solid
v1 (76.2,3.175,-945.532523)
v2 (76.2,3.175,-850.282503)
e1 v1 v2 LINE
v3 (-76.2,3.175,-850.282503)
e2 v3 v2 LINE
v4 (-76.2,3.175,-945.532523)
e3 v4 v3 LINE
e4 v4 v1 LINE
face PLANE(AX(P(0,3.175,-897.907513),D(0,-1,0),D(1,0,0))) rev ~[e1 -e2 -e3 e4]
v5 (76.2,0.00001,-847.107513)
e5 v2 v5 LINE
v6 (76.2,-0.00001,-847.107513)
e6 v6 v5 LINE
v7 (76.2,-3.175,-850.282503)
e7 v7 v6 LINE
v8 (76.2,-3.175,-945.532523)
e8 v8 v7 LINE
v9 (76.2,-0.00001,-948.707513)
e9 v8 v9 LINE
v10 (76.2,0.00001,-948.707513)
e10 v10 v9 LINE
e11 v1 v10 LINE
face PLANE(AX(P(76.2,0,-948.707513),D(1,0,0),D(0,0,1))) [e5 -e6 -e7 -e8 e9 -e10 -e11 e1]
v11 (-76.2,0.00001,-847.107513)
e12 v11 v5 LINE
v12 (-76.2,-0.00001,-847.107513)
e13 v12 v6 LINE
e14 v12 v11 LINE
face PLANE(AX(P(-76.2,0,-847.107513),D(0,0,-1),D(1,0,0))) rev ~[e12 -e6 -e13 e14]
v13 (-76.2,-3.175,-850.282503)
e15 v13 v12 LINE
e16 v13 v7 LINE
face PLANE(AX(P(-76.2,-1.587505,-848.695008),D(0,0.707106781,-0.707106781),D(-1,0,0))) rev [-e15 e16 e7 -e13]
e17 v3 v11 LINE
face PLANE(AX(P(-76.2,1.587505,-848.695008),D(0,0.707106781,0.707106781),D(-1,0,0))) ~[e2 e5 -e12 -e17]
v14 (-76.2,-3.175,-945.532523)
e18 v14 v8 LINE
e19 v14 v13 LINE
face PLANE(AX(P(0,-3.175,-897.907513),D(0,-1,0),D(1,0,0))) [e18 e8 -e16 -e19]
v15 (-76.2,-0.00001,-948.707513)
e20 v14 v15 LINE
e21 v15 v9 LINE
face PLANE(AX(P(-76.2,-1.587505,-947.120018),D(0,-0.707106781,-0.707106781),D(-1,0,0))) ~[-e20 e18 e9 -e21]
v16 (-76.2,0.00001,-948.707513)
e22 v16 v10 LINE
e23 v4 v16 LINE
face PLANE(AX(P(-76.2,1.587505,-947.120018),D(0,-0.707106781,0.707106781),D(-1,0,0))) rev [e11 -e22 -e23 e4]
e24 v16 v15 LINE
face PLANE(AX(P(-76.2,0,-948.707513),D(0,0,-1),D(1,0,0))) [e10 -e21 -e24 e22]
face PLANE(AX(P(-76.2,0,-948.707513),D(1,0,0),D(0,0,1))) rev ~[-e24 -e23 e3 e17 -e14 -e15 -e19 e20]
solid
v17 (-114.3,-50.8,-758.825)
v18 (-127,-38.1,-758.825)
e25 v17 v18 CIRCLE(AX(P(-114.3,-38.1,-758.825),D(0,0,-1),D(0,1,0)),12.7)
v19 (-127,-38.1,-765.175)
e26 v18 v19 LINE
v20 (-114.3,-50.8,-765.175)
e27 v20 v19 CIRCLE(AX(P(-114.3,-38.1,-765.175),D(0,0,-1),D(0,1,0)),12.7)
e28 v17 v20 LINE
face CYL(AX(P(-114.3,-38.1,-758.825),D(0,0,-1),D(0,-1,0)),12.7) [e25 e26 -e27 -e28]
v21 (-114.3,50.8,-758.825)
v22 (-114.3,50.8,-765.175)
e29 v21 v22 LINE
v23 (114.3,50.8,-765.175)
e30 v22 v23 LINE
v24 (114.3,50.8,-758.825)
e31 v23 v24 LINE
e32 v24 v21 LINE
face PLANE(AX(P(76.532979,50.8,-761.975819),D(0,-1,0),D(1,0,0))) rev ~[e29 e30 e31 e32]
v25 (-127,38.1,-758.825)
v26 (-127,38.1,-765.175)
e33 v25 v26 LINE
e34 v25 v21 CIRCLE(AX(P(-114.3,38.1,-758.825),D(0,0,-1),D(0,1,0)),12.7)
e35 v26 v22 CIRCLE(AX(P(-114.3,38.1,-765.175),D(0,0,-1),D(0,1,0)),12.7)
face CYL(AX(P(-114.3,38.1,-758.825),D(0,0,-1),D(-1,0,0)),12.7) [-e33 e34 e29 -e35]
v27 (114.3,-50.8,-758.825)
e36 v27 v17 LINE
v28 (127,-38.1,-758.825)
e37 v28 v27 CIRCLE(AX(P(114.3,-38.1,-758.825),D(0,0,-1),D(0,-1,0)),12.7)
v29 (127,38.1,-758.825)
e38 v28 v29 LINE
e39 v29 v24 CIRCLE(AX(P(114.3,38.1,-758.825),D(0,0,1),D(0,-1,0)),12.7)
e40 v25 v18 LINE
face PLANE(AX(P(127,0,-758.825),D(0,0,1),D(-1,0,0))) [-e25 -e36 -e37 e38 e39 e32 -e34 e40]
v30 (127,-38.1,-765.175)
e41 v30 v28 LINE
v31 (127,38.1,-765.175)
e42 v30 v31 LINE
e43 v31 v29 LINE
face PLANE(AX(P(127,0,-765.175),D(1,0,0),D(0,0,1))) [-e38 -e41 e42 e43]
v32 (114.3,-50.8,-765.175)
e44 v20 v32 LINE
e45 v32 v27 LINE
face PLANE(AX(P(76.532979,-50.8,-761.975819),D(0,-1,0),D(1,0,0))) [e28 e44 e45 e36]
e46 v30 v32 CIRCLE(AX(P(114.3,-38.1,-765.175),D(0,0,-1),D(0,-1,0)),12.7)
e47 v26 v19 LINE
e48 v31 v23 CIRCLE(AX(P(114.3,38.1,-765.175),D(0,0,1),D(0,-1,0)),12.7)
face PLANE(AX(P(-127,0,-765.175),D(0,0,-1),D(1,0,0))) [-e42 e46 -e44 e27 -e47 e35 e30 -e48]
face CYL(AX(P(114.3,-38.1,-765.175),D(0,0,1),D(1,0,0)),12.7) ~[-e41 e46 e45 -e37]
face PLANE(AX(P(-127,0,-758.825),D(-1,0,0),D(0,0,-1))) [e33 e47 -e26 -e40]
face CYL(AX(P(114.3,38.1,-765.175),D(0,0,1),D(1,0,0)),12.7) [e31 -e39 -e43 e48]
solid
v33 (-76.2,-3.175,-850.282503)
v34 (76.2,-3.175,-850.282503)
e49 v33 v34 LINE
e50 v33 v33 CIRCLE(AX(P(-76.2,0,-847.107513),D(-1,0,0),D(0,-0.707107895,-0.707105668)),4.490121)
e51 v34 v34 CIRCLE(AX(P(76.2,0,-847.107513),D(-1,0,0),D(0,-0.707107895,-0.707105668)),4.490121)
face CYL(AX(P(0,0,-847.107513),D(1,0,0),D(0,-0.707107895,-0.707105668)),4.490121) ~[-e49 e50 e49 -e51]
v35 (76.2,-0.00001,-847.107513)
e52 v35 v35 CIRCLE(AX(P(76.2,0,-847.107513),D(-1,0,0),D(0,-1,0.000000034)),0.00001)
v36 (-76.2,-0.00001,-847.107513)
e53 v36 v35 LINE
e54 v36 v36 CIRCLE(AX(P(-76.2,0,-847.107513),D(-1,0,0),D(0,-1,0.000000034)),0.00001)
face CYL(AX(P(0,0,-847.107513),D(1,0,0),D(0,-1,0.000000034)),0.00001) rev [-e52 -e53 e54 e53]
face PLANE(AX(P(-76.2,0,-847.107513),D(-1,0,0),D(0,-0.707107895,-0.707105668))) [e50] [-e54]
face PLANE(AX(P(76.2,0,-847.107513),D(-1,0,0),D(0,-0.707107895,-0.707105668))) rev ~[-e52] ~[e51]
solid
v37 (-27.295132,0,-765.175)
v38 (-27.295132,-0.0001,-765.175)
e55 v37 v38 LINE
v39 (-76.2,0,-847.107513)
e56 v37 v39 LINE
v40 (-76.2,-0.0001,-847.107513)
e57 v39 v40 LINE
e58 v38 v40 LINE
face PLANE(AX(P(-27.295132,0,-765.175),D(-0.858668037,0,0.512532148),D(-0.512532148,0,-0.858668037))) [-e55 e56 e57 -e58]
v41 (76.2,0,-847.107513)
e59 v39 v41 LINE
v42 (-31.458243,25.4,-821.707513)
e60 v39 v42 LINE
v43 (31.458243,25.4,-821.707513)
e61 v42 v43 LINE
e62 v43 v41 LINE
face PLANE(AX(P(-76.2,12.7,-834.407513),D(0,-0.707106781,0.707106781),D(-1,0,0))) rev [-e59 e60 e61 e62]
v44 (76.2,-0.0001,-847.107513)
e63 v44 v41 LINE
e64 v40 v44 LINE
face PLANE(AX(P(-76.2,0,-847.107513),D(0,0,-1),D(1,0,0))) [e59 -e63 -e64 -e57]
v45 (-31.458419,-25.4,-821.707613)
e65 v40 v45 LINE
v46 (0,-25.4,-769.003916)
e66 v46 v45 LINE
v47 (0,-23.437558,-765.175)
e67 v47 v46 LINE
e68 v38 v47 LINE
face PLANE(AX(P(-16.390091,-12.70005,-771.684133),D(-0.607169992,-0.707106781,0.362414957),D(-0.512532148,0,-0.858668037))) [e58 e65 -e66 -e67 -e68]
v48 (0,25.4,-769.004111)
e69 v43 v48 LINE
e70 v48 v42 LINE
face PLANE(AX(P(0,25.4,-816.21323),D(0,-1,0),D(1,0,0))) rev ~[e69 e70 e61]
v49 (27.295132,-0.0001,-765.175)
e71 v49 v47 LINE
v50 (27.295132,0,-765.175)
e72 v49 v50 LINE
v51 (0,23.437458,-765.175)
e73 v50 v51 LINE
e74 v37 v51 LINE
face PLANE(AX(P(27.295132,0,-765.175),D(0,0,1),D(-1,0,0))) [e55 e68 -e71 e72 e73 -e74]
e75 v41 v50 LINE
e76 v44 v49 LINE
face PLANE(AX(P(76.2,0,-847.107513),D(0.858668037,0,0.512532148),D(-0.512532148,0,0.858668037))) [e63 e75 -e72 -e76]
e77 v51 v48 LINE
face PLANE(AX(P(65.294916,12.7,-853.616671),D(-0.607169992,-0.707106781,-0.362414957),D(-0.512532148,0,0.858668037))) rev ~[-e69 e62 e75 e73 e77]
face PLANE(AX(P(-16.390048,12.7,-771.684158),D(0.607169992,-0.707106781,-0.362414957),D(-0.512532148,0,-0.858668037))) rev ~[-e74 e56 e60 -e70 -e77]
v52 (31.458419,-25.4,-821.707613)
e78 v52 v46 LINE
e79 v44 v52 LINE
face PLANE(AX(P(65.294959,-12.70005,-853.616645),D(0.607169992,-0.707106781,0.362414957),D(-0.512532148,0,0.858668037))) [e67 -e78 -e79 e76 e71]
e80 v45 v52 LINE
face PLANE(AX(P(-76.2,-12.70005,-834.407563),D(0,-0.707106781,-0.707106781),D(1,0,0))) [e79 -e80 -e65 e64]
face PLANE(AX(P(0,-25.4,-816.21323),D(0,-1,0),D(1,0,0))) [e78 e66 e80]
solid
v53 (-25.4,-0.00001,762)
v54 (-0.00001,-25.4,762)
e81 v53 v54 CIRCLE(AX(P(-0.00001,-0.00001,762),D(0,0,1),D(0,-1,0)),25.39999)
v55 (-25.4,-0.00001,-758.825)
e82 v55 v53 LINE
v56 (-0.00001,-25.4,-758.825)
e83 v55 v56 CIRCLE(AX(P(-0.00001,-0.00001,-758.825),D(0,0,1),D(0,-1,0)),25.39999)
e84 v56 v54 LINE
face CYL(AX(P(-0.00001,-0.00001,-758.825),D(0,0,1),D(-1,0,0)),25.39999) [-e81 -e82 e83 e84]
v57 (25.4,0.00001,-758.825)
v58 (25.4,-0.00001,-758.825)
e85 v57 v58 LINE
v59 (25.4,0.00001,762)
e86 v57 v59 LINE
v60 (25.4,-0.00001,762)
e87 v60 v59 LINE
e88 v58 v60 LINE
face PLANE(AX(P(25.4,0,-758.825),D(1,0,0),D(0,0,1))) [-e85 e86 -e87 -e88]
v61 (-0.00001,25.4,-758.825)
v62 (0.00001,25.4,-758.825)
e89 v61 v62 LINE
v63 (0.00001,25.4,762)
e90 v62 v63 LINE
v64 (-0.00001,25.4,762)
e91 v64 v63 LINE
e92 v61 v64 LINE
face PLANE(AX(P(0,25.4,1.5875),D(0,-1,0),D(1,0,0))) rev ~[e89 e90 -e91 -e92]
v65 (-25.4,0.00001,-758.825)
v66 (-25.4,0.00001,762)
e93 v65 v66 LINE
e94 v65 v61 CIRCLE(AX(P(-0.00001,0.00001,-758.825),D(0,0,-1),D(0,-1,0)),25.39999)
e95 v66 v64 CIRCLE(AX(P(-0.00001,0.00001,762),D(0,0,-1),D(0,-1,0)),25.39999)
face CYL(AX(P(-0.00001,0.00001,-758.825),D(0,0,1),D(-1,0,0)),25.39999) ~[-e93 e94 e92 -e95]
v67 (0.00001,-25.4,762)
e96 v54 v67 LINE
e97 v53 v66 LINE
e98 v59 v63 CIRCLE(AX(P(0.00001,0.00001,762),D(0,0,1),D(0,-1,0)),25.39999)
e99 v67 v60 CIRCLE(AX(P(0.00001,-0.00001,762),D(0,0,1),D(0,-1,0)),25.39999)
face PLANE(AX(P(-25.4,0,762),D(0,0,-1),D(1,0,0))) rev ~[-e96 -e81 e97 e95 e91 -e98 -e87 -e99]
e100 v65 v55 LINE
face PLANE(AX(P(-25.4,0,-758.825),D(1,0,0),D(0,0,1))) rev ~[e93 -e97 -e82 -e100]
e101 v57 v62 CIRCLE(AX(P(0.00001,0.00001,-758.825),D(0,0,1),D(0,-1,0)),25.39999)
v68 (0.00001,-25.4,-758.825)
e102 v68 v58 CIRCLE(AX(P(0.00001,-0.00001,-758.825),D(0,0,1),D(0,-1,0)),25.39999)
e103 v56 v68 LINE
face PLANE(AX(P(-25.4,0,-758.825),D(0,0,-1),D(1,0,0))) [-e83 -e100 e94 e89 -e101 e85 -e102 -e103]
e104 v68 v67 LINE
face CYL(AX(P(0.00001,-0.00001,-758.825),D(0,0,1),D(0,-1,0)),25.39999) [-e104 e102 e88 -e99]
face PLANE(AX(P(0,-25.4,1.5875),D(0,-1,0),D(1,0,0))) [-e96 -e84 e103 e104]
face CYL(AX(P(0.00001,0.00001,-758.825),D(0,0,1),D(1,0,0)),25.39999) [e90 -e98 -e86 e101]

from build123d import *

# Parameters (mm, degrees)
F0_W       = 50.8
F0_H       = 1520.825
F1_DEPTH   = 25.4
F2_R       = 25.39999
F0_W_2     = 152.4
F0_H_2     = 101.6
F3_DEPTH   = 3.175
F4_DEPTH   = 25.4
F5_C1_SIZE = 25.4
F5_C2_SIZE = 25.3999
F5_C3_SIZE = 25.4
F5_C4_SIZE = 25.3999
F5_C5_SIZE = 25.4
F5_C6_SIZE = 25.3999
F6_SIZE    = 3.17499
F0_H_3     = 3.175
F7_DEPTH   = 50.8
F8_R       = 12.7
F9_SIZE    = 3.17499
F9_FACE_W  = 152.4
F9_FACE_H  = 4.4901139184


# Not quite as in the source:
# - a fillet or chamfer is up to 0.001 mm smaller than in the source, because OpenCascade refuses the exact size


with BuildPart() as f1:
    # F0 (on Front) → F1 (new body, symmetric)
    with BuildSketch(Plane.XZ):
        with Locations((0, 1.5875)):
            Rectangle(F0_W, F0_H)
    extrude(amount=F1_DEPTH, both=True)

    # F2 (radius 25.4 in the source; OpenCascade refuses exactly that, so slightly less here)
    f2_edges = [f1.edges().sort_by_distance(p)[0] for p in [
        (-25.4, -25.4, 1.5875),
        (25.4, -25.4, 1.5875),
        (25.4, 25.4, 1.5875),
        (-25.4, 25.4, 1.5875),
    ]]
    fillet(f2_edges, radius=F2_R)


with BuildPart() as f3:
    # F0 (on Front) → F3 (new body, symmetric)
    with BuildSketch(Plane.XZ):
        with Locations((0, -897.9075126523)):
            Rectangle(F0_W_2, F0_H_2)
    extrude(amount=F3_DEPTH, both=True)

    # F6 (size 3.175 in the source; OpenCascade refuses exactly that, so slightly less here)
    f6_edges = [f3.edges().sort_by_distance(p)[0] for p in [
        (0, 3.175, -948.707513),
        (0, -3.175, -948.707513),
    ]]
    chamfer(f6_edges, length=F6_SIZE)

    # F9 (size 3.175 in the source; OpenCascade refuses exactly that, so slightly less here)
    f9_edges = [f3.edges().sort_by_distance(p)[0] for p in [
        (0, 3.175, -847.107513),
        (0, -3.175, -847.107513),
    ]]
    chamfer(f9_edges, length=F9_SIZE)


with BuildPart() as f4:
    # F0 (on Front) → F4 (new body, symmetric)
    with BuildSketch(Plane.XZ):
        Polygon((27.2951323446, -765.175), (-27.2951323446, -765.175), (-76.2, -847.1075126523), (76.2, -847.1075126523), align=None)
    extrude(amount=F4_DEPTH, both=True)

    # F5: chamfer of 25.4 on 6 edges, made by hand

    # F5_c1
    f5_c1_edges = [f4.edges().sort_by_distance(p)[0] for p in [
        (51.7475661723, 25.4, -806.1412563261),
    ]]
    chamfer(f5_c1_edges, length=F5_C1_SIZE)

    # F5_c2 (size 25.4 in the source; OpenCascade refuses exactly that, so slightly less here)
    f5_c2_edges = [f4.edges().sort_by_distance(p)[0] for p in [
        (51.7475661723, -25.4, -806.1412563261),
    ]]
    chamfer(f5_c2_edges, length=F5_C2_SIZE)

    # F5_c3
    f5_c3_edges = [f4.edges().sort_by_distance(p)[0] for p in [
        (-14.7903490716, 25.4, -847.1075126523),
    ]]
    chamfer(f5_c3_edges, length=F5_C3_SIZE)

    # F5_c4 (size 25.4 in the source; OpenCascade refuses exactly that, so slightly less here)
    f5_c4_edges = [f4.edges().sort_by_distance(p)[0] for p in [
        (-14.7902908419, -25.4, -847.1075126523),
    ]]
    chamfer(f5_c4_edges, length=F5_C4_SIZE)

    # F5_c5
    f5_c5_edges = [f4.edges().sort_by_distance(p)[0] for p in [
        (-44.1670367937, 25.4, -793.4412563261),
    ]]
    chamfer(f5_c5_edges, length=F5_C5_SIZE)

    # F5_c6 (size 25.4 in the source; OpenCascade refuses exactly that, so slightly less here)
    f5_c6_edges = [f4.edges().sort_by_distance(p)[0] for p in [
        (-44.1670666383, -25.4, -793.4413063261),
    ]]
    chamfer(f5_c6_edges, length=F5_C6_SIZE)


with BuildPart() as f7:
    # F0 (on Front) → F7 (new body, symmetric)
    with BuildSketch(Plane.XZ):
        Polygon((127, -758.825), (25.4, -758.825), (25.4, -762), (27.2951323446, -765.175), (127, -765.175), align=None)
        Polygon((-25.4, -762), (-25.4, -758.825), (-127, -758.825), (-127, -765.175), (-27.2951323446, -765.175), align=None)
        with Locations((0, -760.4125)):
            Rectangle(F0_W, F0_H_3)
        Polygon((25.4, -762), (-25.4, -762), (-27.2951323446, -765.175), (27.2951323446, -765.175), align=None)
    extrude(amount=F7_DEPTH, both=True)

    # F8
    f8_edges = [f7.edges().sort_by_distance(p)[0] for p in [
        (127, 50.8, -762),
        (127, -50.8, -762),
        (-127, -50.8, -762),
        (-127, 50.8, -762),
    ]]
    fillet(f8_edges, radius=F8_R)


with BuildPart() as f10:
    # F9_face (on face) → F10 (revolve)
    with BuildSketch(Plane(origin=(0, -1.587505, -848.6950076523), x_dir=(1, 0, 0), z_dir=(0, -0.7071067812, 0.7071067812))):
        Rectangle(F9_FACE_W, F9_FACE_H)
    revolve(axis=Axis((0, 0, -847.1075126523), (-1, 0, 0)))


solid = Compound([f1.part, f3.part, f4.part, f7.part, f10.part])
